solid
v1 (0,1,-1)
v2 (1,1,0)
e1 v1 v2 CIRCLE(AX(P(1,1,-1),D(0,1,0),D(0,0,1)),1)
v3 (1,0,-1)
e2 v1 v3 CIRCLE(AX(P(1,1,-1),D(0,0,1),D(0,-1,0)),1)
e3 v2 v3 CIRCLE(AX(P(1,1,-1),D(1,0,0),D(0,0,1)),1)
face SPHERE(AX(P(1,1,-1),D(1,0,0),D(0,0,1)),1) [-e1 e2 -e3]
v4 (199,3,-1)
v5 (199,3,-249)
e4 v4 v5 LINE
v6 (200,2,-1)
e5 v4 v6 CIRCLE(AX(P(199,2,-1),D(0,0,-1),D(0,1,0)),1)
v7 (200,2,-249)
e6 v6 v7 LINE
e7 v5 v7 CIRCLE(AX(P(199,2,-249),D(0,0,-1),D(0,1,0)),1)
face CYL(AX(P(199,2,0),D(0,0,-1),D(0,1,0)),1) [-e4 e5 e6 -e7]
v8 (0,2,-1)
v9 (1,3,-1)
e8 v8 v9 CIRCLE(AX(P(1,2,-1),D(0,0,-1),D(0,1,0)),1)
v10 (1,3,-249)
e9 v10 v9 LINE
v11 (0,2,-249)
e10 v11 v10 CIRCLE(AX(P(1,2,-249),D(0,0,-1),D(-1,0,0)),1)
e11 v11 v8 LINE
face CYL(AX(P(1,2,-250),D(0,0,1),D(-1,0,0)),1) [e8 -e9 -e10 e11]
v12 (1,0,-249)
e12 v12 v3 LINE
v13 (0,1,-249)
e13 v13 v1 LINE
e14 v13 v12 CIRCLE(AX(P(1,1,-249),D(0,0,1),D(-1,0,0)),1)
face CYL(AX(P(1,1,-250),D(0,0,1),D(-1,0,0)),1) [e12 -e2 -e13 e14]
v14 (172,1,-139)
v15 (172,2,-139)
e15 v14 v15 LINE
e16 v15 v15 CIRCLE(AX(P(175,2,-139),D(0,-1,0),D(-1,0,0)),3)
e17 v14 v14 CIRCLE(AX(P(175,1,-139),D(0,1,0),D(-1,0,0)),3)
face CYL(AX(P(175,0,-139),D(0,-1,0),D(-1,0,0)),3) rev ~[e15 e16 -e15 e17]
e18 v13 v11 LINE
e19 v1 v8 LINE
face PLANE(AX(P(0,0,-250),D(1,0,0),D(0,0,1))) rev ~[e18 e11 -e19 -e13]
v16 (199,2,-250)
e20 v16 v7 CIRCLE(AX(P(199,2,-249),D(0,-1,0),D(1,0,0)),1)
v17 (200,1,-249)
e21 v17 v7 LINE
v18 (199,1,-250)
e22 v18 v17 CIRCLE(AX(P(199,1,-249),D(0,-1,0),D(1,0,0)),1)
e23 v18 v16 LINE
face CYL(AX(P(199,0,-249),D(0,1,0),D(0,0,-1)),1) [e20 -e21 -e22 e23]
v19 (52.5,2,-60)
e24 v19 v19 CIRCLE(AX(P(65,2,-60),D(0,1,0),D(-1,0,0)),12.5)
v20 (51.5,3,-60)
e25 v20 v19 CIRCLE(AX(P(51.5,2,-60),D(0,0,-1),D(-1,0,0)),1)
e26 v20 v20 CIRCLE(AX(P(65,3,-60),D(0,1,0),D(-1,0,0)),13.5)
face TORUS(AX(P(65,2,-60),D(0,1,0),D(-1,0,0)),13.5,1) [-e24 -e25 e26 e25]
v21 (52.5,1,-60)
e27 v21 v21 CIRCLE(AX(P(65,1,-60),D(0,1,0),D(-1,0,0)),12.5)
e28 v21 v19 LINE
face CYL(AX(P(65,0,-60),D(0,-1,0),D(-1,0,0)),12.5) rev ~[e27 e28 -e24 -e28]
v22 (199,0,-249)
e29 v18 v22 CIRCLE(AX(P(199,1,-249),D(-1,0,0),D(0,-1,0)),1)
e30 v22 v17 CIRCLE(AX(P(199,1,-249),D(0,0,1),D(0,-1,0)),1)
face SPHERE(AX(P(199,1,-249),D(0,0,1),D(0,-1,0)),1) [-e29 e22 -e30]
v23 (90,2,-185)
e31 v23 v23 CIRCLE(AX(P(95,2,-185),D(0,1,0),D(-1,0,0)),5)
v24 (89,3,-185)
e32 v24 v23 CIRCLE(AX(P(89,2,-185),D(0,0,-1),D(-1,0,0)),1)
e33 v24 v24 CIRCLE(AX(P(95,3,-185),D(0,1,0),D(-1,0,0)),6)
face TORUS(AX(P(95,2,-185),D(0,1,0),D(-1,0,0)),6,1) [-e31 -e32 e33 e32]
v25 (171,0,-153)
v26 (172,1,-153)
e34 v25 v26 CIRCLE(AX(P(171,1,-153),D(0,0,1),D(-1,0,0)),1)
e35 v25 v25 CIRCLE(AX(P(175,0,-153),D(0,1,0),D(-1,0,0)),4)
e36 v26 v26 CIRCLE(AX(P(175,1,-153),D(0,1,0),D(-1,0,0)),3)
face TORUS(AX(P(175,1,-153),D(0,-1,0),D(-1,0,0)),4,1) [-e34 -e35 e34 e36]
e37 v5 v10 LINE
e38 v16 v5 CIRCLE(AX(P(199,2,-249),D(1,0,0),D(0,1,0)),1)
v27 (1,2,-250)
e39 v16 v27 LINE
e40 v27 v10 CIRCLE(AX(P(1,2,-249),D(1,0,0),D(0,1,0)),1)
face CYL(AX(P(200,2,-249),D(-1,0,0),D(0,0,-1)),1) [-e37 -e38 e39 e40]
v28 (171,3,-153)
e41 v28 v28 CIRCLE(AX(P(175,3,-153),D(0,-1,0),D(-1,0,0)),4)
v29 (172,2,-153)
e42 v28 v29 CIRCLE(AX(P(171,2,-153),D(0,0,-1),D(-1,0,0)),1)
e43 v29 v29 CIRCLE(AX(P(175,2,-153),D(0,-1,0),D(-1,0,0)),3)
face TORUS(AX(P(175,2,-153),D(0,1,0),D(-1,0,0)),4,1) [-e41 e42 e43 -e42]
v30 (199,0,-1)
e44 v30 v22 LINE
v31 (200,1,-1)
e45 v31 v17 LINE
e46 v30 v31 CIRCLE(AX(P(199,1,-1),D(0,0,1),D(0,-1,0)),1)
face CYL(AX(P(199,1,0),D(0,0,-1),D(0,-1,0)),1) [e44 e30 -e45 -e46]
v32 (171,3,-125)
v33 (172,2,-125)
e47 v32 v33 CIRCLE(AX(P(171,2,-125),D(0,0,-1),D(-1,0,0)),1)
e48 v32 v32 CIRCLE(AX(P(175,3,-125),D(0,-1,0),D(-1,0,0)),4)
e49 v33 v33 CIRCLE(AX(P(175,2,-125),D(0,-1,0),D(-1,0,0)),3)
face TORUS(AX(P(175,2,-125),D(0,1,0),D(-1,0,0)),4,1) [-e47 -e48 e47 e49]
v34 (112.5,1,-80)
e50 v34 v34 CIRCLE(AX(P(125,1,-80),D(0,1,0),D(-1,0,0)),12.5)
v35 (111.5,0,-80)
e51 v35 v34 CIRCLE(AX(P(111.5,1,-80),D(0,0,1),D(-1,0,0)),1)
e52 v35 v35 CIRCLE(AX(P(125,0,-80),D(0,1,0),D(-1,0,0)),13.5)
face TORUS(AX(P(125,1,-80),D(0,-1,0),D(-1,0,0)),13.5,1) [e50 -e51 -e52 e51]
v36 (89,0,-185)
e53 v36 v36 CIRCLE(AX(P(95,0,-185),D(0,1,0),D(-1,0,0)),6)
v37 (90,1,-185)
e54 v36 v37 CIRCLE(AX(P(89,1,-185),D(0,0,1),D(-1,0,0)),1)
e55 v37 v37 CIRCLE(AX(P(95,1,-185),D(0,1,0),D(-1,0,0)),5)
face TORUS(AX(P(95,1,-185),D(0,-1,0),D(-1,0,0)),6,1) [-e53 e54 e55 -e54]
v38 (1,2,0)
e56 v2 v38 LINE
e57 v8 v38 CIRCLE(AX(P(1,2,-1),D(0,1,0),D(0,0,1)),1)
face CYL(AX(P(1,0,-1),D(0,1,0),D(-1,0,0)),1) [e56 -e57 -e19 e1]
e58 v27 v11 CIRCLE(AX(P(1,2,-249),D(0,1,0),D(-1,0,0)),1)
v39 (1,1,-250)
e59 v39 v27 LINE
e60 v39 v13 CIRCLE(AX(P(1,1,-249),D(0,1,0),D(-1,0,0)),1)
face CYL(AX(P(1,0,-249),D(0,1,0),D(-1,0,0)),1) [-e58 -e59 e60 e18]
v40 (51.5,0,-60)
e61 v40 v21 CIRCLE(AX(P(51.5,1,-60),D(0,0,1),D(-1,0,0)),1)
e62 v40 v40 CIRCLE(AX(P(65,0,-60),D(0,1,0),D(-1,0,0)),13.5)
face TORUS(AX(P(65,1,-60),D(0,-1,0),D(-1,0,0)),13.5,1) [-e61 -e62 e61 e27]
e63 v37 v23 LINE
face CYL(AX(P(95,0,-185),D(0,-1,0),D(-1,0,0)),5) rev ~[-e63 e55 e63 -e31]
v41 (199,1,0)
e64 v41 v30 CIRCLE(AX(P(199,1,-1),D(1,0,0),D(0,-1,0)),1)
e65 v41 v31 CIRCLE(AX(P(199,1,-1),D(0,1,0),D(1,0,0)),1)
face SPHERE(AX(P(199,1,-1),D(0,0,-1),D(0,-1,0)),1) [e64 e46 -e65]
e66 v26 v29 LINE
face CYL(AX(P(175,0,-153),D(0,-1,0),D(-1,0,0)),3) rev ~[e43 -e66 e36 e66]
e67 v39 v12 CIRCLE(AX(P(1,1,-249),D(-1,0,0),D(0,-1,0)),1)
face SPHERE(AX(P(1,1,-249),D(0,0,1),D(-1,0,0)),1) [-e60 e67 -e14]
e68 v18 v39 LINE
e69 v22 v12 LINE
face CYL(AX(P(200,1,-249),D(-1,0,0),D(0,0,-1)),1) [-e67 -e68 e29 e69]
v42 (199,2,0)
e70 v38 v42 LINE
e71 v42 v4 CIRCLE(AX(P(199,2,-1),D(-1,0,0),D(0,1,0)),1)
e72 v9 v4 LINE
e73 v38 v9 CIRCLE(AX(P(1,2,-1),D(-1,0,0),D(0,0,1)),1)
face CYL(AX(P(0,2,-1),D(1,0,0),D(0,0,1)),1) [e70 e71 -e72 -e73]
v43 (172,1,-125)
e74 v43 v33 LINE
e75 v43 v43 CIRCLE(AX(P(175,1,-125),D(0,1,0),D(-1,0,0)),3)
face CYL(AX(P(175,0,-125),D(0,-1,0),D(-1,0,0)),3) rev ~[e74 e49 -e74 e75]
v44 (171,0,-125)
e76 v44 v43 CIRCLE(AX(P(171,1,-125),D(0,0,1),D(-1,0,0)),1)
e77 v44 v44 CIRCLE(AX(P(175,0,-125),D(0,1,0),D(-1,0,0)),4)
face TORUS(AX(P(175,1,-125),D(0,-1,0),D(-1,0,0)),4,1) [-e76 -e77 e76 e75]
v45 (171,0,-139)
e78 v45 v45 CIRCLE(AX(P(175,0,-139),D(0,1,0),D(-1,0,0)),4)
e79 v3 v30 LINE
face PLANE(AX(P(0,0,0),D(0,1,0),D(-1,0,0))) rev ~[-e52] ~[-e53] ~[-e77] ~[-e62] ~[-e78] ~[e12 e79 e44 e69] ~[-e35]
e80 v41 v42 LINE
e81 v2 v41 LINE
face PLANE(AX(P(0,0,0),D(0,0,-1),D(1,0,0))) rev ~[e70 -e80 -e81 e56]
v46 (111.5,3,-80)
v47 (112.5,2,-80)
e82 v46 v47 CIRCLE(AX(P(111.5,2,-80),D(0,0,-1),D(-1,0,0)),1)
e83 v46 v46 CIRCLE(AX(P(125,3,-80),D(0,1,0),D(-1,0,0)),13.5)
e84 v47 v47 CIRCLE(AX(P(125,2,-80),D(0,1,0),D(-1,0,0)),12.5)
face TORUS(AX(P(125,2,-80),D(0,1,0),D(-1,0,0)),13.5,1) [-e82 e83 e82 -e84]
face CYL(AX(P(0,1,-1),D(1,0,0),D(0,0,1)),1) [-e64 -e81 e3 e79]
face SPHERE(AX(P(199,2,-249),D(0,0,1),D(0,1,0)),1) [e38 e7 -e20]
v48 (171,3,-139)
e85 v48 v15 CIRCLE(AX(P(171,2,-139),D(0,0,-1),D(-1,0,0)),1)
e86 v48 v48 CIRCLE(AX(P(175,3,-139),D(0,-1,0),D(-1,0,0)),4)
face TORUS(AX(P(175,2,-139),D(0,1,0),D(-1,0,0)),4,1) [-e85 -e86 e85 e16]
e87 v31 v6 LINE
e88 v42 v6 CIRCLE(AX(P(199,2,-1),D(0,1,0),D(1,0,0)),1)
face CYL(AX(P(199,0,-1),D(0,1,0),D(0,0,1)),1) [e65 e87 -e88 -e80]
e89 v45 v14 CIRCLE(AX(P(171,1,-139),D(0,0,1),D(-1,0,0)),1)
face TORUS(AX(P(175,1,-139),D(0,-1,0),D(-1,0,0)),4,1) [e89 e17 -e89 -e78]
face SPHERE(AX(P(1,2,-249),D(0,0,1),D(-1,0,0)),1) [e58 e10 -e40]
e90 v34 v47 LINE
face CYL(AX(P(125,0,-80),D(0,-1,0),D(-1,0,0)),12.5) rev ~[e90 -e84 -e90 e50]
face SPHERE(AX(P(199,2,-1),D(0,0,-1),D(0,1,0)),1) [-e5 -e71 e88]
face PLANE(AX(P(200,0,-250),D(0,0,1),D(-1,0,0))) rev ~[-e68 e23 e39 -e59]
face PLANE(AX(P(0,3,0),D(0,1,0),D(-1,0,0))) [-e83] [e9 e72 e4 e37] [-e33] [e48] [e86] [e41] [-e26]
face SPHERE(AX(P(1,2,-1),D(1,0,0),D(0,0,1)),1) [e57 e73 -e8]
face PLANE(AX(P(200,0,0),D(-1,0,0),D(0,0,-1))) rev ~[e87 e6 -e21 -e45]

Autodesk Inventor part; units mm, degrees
ref_plane "YZ Plane" through (0, 0, 0) normal (1, 0, 0) x (0, 1, 0)
ref_plane "XZ Plane" through (0, 0, 0) normal (0, 1, 0) x (-1, 0, 0)
ref_plane "XY Plane" through (0, 0, 0) normal (0, 0, 1) x (1, 0, 0)
sketch "page_lines" plane through (0, 0, 0) normal (0, 1, 0) x (-1, 0, 0)
  line L0 (0, 0) -> (-200, 0)
  line L1 (-200, 0) -> (-200, -250)
  line L2 (-200, -250) -> (0, -250)
  line L3 (0, -250) -> (0, 0)
  circle A0 centre (-65, -60) radius 6
  circle A1 centre (-125, -80) radius 6
  circle A2 centre (-65, -60) radius 12.5
  circle A3 centre (-65, -60) radius 8.5
  circle A4 centre (-125, -80) radius 8.5
  circle A5 centre (-125, -80) radius 12.5
  circle A6 centre (-175, -125) radius 3
  line L4 (-175, -125) -> (-175, -209)
  line L5 (-175, -125) -> (-91, -125) construction
  circle A7 centre (-175, -139) radius 3
  circle A8 centre (-175, -153) radius 3
  circle A9 centre (-175, -167) radius 3
  circle A10 centre (-175, -181) radius 3
  circle A11 centre (-175, -195) radius 3
  circle A12 centre (-175, -209) radius 3
  circle A13 centre (-95, -185) radius 2.5
  circle A14 centre (-95, -185) radius 5
  point P0 (-200, -125)
  dimension "d0" = 200
  dimension "d1" = 250
  dimension "d2" = 12
  dimension "d3" = 12
  dimension "d4" = 25
  dimension "d5" = 17
  dimension "d6" = 17
  dimension "d7" = 25
  dimension "d8" = 75
  dimension "d9" = 80
  dimension "d10" = 65
  dimension "d11" = 60
  dimension "d12" = 6
  dimension "d13" = 84
  dimension "d14" = 90
  dimension "d15" = 25
  dimension "d16" = 125
  dimension "d19" = 14
  dimension "d24" = 5
  dimension "d25" = 10
  dimension "d26" = 65
  dimension "d27" = 95
extrude "or" add sketch "page_lines" along normal blind 3 contours L3 L2 L1 L0 | A9 L4 | L4 A9 | A10 L4 | L4 A10 | A11 L4 | L4 A11 | A12
fillet "Fillet1" radius 1 24 edges at (77.5, 3, -60) (77.5, 0, -60) (100, 3, -185) (100, 0, -185) (178, 3, -125) (178, 0, -125) (200, 3, -125) (200, 0, -125) (100, 0, 0) (100, 3, 0) (200, 1.5, 0) (0, 1.5, 0) (0, 3, -125) (0, 0, -125) (0, 1.5, -250) (100, 3, -250) (100, 0, -250) (200, 1.5, -250) (178, 3, -139) (178, 0, -139) (137.5, 3, -80) (137.5, 0, -80) (178, 3, -153) (178, 0, -153)
properties part number "pages_or"
